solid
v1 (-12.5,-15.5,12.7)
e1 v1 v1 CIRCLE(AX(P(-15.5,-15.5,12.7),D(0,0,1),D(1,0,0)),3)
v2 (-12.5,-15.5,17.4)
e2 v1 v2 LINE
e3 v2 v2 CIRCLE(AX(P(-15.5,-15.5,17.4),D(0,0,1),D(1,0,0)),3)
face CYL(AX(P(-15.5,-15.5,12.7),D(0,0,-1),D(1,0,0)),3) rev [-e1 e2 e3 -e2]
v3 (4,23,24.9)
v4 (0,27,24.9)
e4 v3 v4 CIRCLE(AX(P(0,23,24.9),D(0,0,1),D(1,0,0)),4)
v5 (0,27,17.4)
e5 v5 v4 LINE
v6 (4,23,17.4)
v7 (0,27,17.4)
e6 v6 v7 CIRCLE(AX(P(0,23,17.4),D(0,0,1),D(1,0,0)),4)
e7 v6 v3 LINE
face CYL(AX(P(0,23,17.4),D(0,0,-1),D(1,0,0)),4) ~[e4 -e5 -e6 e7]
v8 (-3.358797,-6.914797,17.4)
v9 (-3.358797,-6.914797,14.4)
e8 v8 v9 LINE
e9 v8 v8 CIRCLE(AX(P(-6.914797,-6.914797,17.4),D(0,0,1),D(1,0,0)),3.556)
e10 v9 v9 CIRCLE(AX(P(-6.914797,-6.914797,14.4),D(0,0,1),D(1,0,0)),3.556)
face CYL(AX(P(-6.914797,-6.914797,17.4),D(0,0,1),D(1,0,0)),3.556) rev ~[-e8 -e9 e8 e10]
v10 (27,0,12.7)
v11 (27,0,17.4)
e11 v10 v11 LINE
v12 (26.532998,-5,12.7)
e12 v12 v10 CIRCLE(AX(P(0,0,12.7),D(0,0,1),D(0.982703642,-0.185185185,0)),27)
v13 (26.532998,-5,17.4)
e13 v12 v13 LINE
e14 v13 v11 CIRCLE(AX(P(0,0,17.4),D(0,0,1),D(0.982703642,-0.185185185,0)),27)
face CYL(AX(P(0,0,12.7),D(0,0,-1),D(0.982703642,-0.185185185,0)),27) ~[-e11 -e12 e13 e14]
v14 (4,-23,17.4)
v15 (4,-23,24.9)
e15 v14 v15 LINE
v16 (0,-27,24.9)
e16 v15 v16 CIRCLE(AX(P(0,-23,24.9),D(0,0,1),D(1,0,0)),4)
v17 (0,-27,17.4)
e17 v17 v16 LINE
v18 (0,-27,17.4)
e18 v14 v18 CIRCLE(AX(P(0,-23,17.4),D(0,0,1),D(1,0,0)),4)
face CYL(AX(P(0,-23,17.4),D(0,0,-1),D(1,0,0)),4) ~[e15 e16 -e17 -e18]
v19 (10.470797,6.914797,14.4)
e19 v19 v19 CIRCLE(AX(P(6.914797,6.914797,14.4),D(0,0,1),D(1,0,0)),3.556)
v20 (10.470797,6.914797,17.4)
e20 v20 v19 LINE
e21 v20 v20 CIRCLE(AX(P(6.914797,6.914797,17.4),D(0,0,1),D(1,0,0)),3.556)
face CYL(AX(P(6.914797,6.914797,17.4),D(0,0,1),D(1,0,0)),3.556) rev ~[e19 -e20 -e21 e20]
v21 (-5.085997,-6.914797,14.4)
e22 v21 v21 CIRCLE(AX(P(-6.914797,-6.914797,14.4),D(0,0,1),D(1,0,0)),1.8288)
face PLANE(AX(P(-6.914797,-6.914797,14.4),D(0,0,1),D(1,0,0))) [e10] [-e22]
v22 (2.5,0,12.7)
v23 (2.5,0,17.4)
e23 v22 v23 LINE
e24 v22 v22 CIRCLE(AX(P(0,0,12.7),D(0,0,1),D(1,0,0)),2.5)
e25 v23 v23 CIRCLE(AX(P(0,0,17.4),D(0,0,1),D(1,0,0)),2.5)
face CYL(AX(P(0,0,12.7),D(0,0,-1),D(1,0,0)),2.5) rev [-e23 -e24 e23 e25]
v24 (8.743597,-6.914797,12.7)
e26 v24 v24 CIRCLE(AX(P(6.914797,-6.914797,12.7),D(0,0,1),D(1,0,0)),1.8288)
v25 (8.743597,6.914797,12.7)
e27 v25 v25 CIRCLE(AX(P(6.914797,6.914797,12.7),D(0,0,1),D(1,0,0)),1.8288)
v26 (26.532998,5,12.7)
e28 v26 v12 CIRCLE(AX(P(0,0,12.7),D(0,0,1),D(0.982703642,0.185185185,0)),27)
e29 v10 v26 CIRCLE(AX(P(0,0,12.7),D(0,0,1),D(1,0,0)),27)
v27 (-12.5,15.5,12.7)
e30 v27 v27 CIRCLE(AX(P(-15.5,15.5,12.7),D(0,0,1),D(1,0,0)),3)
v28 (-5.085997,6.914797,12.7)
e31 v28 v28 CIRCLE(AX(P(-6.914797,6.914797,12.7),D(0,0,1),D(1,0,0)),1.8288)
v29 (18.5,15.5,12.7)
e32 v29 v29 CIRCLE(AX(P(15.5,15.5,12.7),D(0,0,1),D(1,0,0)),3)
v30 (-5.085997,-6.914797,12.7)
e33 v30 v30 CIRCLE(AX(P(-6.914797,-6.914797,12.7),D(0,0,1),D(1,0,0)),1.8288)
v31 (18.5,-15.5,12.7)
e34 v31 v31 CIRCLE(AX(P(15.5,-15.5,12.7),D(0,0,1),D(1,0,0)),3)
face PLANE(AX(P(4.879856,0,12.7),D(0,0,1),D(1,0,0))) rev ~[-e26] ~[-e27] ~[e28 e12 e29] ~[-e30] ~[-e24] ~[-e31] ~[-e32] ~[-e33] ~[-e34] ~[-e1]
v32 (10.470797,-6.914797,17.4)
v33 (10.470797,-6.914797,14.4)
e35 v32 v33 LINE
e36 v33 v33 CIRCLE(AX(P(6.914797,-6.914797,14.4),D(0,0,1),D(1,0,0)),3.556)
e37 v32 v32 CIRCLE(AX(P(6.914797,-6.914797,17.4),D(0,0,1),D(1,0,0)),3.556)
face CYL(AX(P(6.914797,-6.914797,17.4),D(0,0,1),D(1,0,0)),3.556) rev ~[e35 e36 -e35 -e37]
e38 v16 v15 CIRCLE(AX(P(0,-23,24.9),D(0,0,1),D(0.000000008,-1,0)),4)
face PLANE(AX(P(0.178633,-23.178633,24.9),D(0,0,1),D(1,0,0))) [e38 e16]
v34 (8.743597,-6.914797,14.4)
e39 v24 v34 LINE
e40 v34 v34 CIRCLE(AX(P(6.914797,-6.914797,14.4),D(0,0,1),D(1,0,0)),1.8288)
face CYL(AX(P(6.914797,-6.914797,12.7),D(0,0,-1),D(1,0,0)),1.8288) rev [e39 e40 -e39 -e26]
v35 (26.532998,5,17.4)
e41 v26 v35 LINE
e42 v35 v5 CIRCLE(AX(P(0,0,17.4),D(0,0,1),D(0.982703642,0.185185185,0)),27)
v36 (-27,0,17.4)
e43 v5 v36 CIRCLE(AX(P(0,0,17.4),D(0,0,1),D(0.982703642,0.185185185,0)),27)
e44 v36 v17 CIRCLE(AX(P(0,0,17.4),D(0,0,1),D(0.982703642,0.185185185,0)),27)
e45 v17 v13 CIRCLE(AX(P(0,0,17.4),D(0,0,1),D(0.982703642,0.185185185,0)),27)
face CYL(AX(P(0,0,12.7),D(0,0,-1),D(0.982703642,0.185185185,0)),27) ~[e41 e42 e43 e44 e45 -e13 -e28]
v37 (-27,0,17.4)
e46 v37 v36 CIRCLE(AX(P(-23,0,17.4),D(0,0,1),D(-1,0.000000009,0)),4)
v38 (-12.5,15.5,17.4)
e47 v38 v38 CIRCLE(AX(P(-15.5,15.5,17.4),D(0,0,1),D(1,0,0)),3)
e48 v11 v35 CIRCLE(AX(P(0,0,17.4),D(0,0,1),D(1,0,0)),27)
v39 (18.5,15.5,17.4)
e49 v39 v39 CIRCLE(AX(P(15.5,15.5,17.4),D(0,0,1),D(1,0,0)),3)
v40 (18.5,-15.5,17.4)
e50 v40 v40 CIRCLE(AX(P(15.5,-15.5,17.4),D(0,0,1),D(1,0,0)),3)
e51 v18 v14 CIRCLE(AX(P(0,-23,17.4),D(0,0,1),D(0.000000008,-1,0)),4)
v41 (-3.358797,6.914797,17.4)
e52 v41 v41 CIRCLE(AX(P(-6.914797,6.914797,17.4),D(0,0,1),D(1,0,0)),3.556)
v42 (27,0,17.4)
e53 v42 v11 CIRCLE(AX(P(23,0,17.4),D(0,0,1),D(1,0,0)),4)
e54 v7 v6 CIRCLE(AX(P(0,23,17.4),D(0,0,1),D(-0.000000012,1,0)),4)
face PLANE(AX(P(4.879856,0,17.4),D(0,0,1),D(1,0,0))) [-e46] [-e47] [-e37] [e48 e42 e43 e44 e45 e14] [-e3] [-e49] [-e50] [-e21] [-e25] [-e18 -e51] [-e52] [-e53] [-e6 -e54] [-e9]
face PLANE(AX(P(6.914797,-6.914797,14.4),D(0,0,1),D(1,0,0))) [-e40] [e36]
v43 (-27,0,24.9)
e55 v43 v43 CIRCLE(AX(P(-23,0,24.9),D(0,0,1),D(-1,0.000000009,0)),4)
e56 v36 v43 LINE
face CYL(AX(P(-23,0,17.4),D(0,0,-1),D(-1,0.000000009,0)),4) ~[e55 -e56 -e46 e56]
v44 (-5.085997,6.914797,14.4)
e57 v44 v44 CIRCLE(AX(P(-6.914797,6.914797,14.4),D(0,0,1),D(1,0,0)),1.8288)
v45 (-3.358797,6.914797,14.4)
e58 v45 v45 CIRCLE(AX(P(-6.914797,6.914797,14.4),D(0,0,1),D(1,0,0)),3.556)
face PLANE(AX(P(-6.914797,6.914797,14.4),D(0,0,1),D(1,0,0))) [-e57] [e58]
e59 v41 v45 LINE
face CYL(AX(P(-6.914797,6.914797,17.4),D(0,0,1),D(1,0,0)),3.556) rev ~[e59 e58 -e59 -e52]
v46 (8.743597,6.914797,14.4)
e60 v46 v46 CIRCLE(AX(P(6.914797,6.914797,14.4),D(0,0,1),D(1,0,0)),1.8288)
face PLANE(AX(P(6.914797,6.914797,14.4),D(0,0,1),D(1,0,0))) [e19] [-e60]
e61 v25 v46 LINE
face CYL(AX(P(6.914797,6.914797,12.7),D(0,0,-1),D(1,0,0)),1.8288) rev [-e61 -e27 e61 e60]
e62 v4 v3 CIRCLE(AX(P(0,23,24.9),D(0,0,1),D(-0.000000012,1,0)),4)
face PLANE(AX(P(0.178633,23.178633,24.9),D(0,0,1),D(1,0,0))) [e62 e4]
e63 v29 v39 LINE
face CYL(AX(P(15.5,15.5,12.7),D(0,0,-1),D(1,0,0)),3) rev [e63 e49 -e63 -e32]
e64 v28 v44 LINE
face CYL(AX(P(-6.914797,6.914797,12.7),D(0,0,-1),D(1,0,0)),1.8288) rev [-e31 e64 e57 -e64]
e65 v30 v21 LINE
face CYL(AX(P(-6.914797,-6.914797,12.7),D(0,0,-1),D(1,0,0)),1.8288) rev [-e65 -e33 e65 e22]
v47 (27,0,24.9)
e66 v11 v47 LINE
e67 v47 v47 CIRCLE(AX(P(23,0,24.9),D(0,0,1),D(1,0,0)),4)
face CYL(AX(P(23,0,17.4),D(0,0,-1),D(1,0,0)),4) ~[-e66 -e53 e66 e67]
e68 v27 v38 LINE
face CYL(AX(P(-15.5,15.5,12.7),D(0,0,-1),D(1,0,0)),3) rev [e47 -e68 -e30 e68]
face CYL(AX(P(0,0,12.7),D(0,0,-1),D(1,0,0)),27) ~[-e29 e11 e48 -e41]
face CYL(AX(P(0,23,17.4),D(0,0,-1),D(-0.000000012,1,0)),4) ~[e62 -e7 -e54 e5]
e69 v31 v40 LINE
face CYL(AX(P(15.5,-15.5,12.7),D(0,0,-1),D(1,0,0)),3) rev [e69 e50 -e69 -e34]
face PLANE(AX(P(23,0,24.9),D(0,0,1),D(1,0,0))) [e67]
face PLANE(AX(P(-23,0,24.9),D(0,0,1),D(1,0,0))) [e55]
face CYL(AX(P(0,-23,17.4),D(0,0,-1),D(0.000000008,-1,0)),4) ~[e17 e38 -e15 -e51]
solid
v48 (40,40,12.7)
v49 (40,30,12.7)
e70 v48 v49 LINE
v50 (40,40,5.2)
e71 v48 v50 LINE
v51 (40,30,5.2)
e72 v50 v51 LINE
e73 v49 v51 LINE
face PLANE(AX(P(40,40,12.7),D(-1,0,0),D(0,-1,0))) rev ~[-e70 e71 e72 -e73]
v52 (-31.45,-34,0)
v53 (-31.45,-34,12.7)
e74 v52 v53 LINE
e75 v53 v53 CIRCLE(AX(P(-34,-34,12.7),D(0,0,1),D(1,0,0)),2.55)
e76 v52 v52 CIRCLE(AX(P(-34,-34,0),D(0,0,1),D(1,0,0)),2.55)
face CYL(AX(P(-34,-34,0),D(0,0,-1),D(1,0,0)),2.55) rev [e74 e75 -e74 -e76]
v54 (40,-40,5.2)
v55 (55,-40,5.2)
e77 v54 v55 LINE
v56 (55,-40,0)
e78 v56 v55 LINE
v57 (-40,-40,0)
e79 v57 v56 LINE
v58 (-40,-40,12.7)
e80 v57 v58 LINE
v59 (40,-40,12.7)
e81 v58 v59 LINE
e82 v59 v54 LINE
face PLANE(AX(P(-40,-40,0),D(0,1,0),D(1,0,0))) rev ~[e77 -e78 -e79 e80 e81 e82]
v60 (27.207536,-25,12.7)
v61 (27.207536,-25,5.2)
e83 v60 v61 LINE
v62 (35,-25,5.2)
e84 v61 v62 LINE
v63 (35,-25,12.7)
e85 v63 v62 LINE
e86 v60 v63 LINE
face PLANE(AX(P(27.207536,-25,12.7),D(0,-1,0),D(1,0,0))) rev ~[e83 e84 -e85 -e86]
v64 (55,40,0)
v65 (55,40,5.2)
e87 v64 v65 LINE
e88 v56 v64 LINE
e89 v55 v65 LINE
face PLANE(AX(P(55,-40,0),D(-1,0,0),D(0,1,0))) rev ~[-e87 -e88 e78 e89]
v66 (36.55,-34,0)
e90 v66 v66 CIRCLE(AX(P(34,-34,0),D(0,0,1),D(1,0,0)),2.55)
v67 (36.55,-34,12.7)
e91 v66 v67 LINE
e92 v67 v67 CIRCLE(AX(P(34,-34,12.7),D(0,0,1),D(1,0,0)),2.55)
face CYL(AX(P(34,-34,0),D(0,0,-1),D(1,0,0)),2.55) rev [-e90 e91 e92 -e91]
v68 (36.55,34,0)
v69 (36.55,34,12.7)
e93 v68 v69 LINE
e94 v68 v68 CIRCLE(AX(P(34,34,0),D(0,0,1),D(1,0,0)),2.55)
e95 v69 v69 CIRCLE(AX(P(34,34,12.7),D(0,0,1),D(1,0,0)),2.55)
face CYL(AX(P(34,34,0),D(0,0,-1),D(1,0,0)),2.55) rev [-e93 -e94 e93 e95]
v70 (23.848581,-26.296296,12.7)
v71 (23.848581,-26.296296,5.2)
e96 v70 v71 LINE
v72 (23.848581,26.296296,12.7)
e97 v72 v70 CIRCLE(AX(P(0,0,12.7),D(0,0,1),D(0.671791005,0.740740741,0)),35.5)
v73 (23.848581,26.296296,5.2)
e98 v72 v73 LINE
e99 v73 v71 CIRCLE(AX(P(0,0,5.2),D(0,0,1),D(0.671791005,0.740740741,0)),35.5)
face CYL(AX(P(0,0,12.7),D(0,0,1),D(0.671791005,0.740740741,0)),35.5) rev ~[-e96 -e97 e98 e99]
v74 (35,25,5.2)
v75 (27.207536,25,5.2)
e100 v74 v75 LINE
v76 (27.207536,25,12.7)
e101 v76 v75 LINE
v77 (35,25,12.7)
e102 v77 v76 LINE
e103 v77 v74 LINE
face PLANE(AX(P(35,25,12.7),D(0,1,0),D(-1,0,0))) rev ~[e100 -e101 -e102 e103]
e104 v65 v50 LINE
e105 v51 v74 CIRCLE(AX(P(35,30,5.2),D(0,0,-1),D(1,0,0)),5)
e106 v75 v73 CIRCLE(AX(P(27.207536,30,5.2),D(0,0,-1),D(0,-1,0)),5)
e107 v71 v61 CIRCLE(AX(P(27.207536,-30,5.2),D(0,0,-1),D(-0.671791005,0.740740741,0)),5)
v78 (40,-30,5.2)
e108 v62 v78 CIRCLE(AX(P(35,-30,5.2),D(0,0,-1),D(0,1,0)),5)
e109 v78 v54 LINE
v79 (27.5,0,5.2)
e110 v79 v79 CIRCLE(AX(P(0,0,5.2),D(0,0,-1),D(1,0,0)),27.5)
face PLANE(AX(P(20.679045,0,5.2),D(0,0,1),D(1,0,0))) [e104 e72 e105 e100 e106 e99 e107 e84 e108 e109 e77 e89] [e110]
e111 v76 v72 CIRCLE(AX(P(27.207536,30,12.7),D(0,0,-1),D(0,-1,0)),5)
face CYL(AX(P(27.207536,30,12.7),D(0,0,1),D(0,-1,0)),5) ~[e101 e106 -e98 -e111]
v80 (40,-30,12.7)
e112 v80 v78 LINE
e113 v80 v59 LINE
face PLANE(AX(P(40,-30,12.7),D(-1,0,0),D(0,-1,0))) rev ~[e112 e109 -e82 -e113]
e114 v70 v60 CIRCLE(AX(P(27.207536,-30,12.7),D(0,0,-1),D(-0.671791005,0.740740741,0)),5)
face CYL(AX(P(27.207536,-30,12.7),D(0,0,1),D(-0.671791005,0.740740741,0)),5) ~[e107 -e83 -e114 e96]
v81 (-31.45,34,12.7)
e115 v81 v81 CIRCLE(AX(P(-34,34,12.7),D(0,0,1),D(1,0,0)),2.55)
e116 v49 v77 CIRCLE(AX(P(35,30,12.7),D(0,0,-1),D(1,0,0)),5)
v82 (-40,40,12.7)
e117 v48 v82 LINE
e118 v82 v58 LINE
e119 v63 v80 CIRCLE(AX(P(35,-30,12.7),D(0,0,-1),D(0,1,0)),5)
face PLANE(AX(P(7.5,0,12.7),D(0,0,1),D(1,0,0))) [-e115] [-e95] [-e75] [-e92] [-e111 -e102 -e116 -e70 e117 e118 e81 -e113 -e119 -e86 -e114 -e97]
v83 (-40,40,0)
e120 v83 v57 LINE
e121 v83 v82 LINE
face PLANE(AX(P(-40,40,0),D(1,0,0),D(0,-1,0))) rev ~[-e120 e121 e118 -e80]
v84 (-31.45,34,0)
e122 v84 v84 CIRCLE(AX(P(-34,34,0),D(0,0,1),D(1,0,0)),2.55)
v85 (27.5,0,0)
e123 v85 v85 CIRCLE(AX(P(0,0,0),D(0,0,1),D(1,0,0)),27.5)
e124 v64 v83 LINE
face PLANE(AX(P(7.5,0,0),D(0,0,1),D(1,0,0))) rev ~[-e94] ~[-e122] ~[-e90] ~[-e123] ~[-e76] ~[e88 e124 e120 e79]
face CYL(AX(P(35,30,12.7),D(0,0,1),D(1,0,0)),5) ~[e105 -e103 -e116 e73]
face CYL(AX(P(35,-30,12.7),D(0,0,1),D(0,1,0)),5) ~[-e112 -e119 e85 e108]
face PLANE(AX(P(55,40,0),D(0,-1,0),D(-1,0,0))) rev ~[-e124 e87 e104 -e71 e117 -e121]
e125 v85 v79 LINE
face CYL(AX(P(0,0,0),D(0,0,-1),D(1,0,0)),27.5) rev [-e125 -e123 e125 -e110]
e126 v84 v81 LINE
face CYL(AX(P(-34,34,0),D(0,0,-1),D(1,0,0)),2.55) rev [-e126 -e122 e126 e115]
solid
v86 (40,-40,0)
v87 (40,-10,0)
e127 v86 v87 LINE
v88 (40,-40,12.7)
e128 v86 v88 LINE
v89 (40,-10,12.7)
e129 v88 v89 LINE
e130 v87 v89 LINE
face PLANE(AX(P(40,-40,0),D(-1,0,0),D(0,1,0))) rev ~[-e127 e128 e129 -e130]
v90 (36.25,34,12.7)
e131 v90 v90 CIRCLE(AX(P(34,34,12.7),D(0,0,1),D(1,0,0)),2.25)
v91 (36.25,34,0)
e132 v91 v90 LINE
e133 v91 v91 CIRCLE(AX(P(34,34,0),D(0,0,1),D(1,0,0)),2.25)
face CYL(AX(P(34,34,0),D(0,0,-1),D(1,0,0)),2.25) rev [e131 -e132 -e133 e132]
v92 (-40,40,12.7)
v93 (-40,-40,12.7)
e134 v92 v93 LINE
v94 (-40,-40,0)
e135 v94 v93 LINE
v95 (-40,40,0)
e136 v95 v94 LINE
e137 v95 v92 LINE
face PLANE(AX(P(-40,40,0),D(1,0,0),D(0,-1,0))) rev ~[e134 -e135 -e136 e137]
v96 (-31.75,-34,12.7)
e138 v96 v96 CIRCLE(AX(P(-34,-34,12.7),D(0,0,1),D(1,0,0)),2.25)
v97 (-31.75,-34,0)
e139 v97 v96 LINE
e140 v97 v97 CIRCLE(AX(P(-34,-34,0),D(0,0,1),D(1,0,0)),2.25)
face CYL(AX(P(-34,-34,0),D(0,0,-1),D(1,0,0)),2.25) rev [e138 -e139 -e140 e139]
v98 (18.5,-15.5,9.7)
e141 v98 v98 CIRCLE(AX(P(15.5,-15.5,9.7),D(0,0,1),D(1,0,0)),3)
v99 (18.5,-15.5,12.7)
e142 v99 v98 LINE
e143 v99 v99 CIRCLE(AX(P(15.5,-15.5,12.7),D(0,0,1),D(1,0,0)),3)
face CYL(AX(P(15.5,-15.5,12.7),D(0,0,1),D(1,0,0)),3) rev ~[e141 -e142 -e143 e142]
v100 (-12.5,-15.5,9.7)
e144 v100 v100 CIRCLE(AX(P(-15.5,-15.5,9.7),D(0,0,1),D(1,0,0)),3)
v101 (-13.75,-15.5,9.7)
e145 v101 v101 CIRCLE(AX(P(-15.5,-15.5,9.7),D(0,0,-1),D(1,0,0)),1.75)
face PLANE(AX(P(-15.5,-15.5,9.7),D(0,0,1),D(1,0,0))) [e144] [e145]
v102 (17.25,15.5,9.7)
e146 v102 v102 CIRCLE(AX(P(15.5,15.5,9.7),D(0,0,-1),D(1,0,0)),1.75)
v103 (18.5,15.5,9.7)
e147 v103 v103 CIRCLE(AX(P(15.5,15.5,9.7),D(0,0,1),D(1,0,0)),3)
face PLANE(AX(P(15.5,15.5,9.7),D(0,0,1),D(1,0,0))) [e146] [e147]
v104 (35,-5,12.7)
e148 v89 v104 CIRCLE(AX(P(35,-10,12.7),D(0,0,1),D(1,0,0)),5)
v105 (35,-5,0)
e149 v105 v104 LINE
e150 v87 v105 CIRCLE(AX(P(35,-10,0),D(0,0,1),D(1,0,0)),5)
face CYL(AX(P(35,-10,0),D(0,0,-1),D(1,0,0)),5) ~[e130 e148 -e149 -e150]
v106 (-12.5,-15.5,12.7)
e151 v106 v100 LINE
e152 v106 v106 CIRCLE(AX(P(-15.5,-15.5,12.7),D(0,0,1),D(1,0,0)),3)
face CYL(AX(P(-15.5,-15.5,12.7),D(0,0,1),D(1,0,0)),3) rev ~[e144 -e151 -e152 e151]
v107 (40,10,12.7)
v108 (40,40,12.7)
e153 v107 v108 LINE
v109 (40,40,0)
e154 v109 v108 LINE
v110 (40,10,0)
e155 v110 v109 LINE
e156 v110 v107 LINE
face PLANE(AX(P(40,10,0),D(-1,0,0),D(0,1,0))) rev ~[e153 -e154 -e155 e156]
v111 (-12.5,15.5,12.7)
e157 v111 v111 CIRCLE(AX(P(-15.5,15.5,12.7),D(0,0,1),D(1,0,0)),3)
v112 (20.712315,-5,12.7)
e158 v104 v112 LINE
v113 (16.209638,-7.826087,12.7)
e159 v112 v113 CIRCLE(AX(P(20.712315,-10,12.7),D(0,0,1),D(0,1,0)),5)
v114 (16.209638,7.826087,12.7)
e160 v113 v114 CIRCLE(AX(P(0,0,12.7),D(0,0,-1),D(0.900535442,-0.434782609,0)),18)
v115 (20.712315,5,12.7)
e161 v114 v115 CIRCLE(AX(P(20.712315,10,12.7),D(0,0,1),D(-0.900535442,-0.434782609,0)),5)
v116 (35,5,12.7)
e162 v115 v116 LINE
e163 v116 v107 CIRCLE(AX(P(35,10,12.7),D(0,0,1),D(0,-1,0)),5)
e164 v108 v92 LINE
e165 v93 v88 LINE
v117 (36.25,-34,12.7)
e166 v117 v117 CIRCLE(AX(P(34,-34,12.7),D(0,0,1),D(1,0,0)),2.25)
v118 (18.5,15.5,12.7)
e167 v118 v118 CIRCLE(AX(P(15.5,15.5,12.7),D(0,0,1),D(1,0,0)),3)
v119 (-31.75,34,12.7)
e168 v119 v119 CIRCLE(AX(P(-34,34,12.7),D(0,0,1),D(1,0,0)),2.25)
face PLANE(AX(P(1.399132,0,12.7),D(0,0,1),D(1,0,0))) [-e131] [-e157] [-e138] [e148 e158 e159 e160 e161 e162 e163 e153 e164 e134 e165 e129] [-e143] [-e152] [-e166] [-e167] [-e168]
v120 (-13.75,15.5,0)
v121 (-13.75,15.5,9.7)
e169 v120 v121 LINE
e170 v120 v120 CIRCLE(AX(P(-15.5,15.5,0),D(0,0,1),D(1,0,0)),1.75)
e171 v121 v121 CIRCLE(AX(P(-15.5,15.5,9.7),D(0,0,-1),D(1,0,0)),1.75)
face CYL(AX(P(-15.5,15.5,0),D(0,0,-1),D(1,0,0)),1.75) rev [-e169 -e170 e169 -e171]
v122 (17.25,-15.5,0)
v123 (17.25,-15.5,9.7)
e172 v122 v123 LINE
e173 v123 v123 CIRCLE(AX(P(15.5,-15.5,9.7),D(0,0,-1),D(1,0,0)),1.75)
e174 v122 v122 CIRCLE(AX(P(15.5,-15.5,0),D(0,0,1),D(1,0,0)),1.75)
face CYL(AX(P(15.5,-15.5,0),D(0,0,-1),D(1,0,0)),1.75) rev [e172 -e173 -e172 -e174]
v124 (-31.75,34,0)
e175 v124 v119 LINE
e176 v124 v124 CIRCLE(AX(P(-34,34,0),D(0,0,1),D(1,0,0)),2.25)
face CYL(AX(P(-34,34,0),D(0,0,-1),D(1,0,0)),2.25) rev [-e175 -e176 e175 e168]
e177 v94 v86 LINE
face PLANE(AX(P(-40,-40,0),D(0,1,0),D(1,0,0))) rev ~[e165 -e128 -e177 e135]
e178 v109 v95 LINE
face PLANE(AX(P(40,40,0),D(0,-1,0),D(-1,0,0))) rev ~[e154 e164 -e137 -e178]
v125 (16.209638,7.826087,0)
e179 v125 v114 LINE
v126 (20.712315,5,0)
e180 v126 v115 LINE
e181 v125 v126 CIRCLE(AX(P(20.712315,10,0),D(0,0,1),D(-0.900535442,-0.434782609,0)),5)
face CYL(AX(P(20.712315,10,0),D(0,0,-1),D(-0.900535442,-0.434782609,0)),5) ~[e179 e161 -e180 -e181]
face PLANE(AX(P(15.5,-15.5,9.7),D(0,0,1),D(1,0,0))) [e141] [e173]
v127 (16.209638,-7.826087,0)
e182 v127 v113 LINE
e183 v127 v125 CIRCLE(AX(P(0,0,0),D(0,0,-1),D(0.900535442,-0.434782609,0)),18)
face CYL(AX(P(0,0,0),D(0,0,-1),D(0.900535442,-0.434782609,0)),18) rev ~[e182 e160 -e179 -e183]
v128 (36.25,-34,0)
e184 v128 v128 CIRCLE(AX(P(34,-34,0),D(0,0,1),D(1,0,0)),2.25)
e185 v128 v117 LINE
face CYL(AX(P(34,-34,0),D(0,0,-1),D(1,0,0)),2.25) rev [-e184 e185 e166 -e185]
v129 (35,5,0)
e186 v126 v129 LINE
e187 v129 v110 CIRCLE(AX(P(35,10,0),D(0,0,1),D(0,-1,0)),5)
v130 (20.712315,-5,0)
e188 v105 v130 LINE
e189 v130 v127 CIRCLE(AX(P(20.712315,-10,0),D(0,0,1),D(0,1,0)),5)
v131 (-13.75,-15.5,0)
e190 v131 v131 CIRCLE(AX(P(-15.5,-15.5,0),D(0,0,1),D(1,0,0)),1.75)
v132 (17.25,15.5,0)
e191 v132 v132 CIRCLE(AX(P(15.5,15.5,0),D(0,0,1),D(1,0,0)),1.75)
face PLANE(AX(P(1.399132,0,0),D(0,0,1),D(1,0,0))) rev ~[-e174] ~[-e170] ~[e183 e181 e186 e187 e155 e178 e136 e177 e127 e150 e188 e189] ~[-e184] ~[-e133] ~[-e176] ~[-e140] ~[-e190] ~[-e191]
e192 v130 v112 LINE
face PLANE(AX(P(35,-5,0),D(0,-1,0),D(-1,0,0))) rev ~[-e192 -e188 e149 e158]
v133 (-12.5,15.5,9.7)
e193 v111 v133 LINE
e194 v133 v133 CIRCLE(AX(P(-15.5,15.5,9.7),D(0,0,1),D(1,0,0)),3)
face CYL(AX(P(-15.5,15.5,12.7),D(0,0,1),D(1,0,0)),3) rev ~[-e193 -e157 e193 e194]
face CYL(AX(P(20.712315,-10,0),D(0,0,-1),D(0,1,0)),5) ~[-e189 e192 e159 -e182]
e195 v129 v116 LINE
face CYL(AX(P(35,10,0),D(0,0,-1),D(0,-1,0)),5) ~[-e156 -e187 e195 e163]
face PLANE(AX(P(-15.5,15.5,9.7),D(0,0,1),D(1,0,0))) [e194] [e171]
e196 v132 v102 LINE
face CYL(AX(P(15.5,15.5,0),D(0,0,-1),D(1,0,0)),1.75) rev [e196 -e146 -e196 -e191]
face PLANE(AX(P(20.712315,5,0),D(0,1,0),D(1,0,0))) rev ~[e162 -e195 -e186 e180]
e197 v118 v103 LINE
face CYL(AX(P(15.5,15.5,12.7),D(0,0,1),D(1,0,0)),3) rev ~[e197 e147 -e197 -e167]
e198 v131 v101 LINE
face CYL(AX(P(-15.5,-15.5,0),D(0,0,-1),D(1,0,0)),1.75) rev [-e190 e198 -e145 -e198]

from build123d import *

# Parameters (mm, degrees)
F0_R      = 2.25
F0_R_2    = 3
F0_R_3    = 1.75
F1_DEPTH  = 12.7
F2_R      = 3
F3_DEPTH  = 3
F4_R      = 2.55
F4_R_2    = 27.5
F5_DEPTH  = 12.7
F7_DEPTH  = 7.5
F8_R      = 1.8288
F8_R_2    = 2.5
F8_R_3    = 3
F9_DEPTH  = 4.7
F10_R     = 4
F11_DEPTH = 7.5
F12_R     = 3.556
F12_R_2   = 1.8288
F13_DEPTH = 3


# Not quite as in the source:
# - a length typed as a fraction of an inch, garbled in the dataset ("3 / 203.2 mm" for 3/8 in), is restored
# - a feature names something its author has since deleted; it is built from what else it names


with BuildPart() as f1:
    # F0 (on Top) → F1 (new body)
    with BuildSketch(Plane.XY):
        with BuildLine():
            Line((-40, -40), (40, -40))
            Line((40, -40), (40, -10))
            ThreePointArc((40, -10), (38.5355339059, -6.4644660941), (35, -5))
            Line((35, -5), (20.7123151772, -5))
            ThreePointArc((20.7123151772, -5), (18.0542675119, -5.7650522307), (16.2096379648, -7.8260869565))
            ThreePointArc((16.2096379648, -7.8260869565), (-18, 0), (16.2096379648, 7.8260869565))
            ThreePointArc((16.2096379648, 7.8260869565), (18.0542675119, 5.7650522307), (20.7123151772, 5))
            Line((20.7123151772, 5), (35, 5))
            ThreePointArc((35, 5), (38.5355339059, 6.4644660941), (40, 10))
            Line((40, 10), (40, 40))
            Line((40, 40), (-40, 40))
            Line((-40, 40), (-40, -40))
        make_face()
        with Locations((-34, -34)):
            Circle(F0_R, mode=Mode.SUBTRACT)
        with Locations((-15.5, -15.5)):
            Circle(F0_R_2, mode=Mode.SUBTRACT)
        with Locations((34, -34)):
            Circle(F0_R, mode=Mode.SUBTRACT)
        with Locations((15.5, -15.5)):
            Circle(F0_R_2, mode=Mode.SUBTRACT)
        with Locations((-15.5, 15.5)):
            Circle(F0_R_2, mode=Mode.SUBTRACT)
        with Locations((-34, 34)):
            Circle(F0_R, mode=Mode.SUBTRACT)
        with Locations((15.5, 15.5)):
            Circle(F0_R_2, mode=Mode.SUBTRACT)
        with Locations((34, 34)):
            Circle(F0_R, mode=Mode.SUBTRACT)
        with Locations((-15.5, 15.5)):
            Circle(F0_R_2)
        with Locations((-15.5, 15.5)):
            Circle(F0_R_3, mode=Mode.SUBTRACT)
        with Locations((-15.5, -15.5)):
            Circle(F0_R_2)
        with Locations((-15.5, -15.5)):
            Circle(F0_R_3, mode=Mode.SUBTRACT)
        with Locations((15.5, -15.5)):
            Circle(F0_R_2)
        with Locations((15.5, -15.5)):
            Circle(F0_R_3, mode=Mode.SUBTRACT)
        with Locations((15.5, 15.5)):
            Circle(F0_R_2)
        with Locations((15.5, 15.5)):
            Circle(F0_R_3, mode=Mode.SUBTRACT)
    extrude(amount=F1_DEPTH)

    # F2 (on face) → F3 (cut)
    with BuildSketch(Plane.XY.offset(12.7)):
        with Locations((-15.5, 15.5)):
            Circle(F2_R)
        with Locations((15.5, 15.5)):
            Circle(F2_R)
        with Locations((15.5, -15.5)):
            Circle(F2_R)
        with Locations((-15.5, -15.5)):
            Circle(F2_R)
    extrude(amount=-F3_DEPTH, mode=Mode.SUBTRACT)


with BuildPart() as f5:
    # F4 (on Top) → F5 (new body)
    with BuildSketch(Plane.XY):
        Polygon((40, 40), (-40, 40), (-40, -40), (40, -40), (55, -40), (55, 40), align=None)
        with Locations((-34, -34)):
            Circle(F4_R, mode=Mode.SUBTRACT)
        with Locations((34, -34)):
            Circle(F4_R, mode=Mode.SUBTRACT)
        Circle(F4_R_2, mode=Mode.SUBTRACT)
        with Locations((-34, 34)):
            Circle(F4_R, mode=Mode.SUBTRACT)
        with Locations((34, 34)):
            Circle(F4_R, mode=Mode.SUBTRACT)
    extrude(amount=F5_DEPTH)

    # F6 (on face) → F7 (cut)
    with BuildSketch(Plane.XY.offset(12.7)):
        with BuildLine():
            ThreePointArc((27.2075357208, 25), (25.4073299713, 25.3353178823), (23.8485806936, 26.2962962963))
            ThreePointArc((23.8485806936, 26.2962962963), (-35.5, 0), (23.8485806936, -26.2962962963))
            ThreePointArc((23.8485806936, -26.2962962963), (25.4073299713, -25.3353178823), (27.2075357208, -25))
            Line((27.2075357208, -25), (35, -25))
            ThreePointArc((35, -25), (38.5355339059, -26.4644660941), (40, -30))
            Line((40, -30), (40, -40))
            Line((40, -40), (55, -40))
            Line((55, -40), (55, 40))
            Line((55, 40), (40, 40))
            Line((40, 40), (40, 30))
            ThreePointArc((40, 30), (38.5355339059, 26.4644660941), (35, 25))
            Line((35, 25), (27.2075357208, 25))
        make_face()
    extrude(amount=-F7_DEPTH, mode=Mode.SUBTRACT)


with BuildPart() as f9:
    # F8 (on face) → F9 (new body)
    with BuildSketch(Plane.XY.offset(12.7)):
        with BuildLine():
            ThreePointArc((26.5329983228, -5), (26.8829960637, -2.5108808497), (27, 0))
            ThreePointArc((27, 0), (26.8829960637, 2.5108808497), (26.5329983228, 5))
            Line((26.5329983228, 5), (20.7123151772, 5))
            ThreePointArc((20.7123151772, 5), (18.0542675119, 5.7650522307), (16.2096379648, 7.8260869565))
            ThreePointArc((16.2096379648, 7.8260869565), (-18, 0), (16.2096379648, -7.8260869565))
            ThreePointArc((16.2096379648, -7.8260869565), (18.0542675119, -5.7650522307), (20.7123151772, -5))
            Line((20.7123151772, -5), (26.5329983228, -5))
        make_face()
        with Locations((-6.9147972132, -6.9147972132)):
            Circle(F8_R, mode=Mode.SUBTRACT)
        with Locations((6.9147972132, -6.9147972132)):
            Circle(F8_R, mode=Mode.SUBTRACT)
        with Locations((-6.9147972132, 6.9147972132)):
            Circle(F8_R, mode=Mode.SUBTRACT)
        Circle(F8_R_2, mode=Mode.SUBTRACT)
        with Locations((6.9147972132, 6.9147972132)):
            Circle(F8_R, mode=Mode.SUBTRACT)
        with BuildLine():
            Line((20.7123151772, 5), (26.5329983228, 5))
            ThreePointArc((26.5329983228, 5), (-27, 0), (26.5329983228, -5))
            Line((26.5329983228, -5), (20.7123151772, -5))
            ThreePointArc((20.7123151772, -5), (18.0542675119, -5.7650522307), (16.2096379648, -7.8260869565))
            ThreePointArc((16.2096379648, -7.8260869565), (-18, 0), (16.2096379648, 7.8260869565))
            ThreePointArc((16.2096379648, 7.8260869565), (18.0542675119, 5.7650522307), (20.7123151772, 5))
        make_face()
        with Locations((-15.5, -15.5)):
            Circle(F8_R_3, mode=Mode.SUBTRACT)
        with Locations((15.5, -15.5)):
            Circle(F8_R_3, mode=Mode.SUBTRACT)
        with Locations((-15.5, 15.5)):
            Circle(F8_R_3, mode=Mode.SUBTRACT)
        with Locations((15.5, 15.5)):
            Circle(F8_R_3, mode=Mode.SUBTRACT)
    extrude(amount=F9_DEPTH)

    # F10 (on face) → F11 (join)
    with BuildSketch(Plane.XY.offset(17.4)):
        with BuildLine():
            ThreePointArc((4, 23), (2.8284271082, 25.8284271413), (-4.69e-08, 27))
            ThreePointArc((-4.69e-08, 27), (-2.8284271082, 20.1715728587), (4, 23))
        make_face()
        with BuildLine():
            ThreePointArc((-19, 0), (-22.9999999822, 4), (-27, 3.56e-08))
            ThreePointArc((-27, 3.56e-08), (-23.0000000178, -4), (-19, 0))
        make_face()
        with BuildLine():
            ThreePointArc((4, -23), (-2.8284271362, -20.1715728867), (3.24e-08, -27))
            ThreePointArc((3.24e-08, -27), (2.8284271362, -25.8284271133), (4, -23))
        make_face()
        with Locations((23, 0)):
            Circle(F10_R)
    extrude(amount=F11_DEPTH)

    # F12 (on face) → F13 (cut)
    with BuildSketch(Plane.XY.offset(17.4)):
        with Locations((-6.9147972132, -6.9147972132)):
            Circle(F12_R)
        with Locations((-6.9147972132, -6.9147972132)):
            Circle(F12_R_2, mode=Mode.SUBTRACT)
        with Locations((-6.9147972132, 6.9147972132)):
            Circle(F12_R)
        with Locations((-6.9147972132, 6.9147972132)):
            Circle(F12_R_2, mode=Mode.SUBTRACT)
        with Locations((6.9147972132, 6.9147972132)):
            Circle(F12_R)
        with Locations((6.9147972132, 6.9147972132)):
            Circle(F12_R_2, mode=Mode.SUBTRACT)
        with Locations((6.9147972132, -6.9147972132)):
            Circle(F12_R)
        with Locations((6.9147972132, -6.9147972132)):
            Circle(F12_R_2, mode=Mode.SUBTRACT)
    extrude(amount=-F13_DEPTH, mode=Mode.SUBTRACT)


solid = Compound([f1.part, f5.part, f9.part])
